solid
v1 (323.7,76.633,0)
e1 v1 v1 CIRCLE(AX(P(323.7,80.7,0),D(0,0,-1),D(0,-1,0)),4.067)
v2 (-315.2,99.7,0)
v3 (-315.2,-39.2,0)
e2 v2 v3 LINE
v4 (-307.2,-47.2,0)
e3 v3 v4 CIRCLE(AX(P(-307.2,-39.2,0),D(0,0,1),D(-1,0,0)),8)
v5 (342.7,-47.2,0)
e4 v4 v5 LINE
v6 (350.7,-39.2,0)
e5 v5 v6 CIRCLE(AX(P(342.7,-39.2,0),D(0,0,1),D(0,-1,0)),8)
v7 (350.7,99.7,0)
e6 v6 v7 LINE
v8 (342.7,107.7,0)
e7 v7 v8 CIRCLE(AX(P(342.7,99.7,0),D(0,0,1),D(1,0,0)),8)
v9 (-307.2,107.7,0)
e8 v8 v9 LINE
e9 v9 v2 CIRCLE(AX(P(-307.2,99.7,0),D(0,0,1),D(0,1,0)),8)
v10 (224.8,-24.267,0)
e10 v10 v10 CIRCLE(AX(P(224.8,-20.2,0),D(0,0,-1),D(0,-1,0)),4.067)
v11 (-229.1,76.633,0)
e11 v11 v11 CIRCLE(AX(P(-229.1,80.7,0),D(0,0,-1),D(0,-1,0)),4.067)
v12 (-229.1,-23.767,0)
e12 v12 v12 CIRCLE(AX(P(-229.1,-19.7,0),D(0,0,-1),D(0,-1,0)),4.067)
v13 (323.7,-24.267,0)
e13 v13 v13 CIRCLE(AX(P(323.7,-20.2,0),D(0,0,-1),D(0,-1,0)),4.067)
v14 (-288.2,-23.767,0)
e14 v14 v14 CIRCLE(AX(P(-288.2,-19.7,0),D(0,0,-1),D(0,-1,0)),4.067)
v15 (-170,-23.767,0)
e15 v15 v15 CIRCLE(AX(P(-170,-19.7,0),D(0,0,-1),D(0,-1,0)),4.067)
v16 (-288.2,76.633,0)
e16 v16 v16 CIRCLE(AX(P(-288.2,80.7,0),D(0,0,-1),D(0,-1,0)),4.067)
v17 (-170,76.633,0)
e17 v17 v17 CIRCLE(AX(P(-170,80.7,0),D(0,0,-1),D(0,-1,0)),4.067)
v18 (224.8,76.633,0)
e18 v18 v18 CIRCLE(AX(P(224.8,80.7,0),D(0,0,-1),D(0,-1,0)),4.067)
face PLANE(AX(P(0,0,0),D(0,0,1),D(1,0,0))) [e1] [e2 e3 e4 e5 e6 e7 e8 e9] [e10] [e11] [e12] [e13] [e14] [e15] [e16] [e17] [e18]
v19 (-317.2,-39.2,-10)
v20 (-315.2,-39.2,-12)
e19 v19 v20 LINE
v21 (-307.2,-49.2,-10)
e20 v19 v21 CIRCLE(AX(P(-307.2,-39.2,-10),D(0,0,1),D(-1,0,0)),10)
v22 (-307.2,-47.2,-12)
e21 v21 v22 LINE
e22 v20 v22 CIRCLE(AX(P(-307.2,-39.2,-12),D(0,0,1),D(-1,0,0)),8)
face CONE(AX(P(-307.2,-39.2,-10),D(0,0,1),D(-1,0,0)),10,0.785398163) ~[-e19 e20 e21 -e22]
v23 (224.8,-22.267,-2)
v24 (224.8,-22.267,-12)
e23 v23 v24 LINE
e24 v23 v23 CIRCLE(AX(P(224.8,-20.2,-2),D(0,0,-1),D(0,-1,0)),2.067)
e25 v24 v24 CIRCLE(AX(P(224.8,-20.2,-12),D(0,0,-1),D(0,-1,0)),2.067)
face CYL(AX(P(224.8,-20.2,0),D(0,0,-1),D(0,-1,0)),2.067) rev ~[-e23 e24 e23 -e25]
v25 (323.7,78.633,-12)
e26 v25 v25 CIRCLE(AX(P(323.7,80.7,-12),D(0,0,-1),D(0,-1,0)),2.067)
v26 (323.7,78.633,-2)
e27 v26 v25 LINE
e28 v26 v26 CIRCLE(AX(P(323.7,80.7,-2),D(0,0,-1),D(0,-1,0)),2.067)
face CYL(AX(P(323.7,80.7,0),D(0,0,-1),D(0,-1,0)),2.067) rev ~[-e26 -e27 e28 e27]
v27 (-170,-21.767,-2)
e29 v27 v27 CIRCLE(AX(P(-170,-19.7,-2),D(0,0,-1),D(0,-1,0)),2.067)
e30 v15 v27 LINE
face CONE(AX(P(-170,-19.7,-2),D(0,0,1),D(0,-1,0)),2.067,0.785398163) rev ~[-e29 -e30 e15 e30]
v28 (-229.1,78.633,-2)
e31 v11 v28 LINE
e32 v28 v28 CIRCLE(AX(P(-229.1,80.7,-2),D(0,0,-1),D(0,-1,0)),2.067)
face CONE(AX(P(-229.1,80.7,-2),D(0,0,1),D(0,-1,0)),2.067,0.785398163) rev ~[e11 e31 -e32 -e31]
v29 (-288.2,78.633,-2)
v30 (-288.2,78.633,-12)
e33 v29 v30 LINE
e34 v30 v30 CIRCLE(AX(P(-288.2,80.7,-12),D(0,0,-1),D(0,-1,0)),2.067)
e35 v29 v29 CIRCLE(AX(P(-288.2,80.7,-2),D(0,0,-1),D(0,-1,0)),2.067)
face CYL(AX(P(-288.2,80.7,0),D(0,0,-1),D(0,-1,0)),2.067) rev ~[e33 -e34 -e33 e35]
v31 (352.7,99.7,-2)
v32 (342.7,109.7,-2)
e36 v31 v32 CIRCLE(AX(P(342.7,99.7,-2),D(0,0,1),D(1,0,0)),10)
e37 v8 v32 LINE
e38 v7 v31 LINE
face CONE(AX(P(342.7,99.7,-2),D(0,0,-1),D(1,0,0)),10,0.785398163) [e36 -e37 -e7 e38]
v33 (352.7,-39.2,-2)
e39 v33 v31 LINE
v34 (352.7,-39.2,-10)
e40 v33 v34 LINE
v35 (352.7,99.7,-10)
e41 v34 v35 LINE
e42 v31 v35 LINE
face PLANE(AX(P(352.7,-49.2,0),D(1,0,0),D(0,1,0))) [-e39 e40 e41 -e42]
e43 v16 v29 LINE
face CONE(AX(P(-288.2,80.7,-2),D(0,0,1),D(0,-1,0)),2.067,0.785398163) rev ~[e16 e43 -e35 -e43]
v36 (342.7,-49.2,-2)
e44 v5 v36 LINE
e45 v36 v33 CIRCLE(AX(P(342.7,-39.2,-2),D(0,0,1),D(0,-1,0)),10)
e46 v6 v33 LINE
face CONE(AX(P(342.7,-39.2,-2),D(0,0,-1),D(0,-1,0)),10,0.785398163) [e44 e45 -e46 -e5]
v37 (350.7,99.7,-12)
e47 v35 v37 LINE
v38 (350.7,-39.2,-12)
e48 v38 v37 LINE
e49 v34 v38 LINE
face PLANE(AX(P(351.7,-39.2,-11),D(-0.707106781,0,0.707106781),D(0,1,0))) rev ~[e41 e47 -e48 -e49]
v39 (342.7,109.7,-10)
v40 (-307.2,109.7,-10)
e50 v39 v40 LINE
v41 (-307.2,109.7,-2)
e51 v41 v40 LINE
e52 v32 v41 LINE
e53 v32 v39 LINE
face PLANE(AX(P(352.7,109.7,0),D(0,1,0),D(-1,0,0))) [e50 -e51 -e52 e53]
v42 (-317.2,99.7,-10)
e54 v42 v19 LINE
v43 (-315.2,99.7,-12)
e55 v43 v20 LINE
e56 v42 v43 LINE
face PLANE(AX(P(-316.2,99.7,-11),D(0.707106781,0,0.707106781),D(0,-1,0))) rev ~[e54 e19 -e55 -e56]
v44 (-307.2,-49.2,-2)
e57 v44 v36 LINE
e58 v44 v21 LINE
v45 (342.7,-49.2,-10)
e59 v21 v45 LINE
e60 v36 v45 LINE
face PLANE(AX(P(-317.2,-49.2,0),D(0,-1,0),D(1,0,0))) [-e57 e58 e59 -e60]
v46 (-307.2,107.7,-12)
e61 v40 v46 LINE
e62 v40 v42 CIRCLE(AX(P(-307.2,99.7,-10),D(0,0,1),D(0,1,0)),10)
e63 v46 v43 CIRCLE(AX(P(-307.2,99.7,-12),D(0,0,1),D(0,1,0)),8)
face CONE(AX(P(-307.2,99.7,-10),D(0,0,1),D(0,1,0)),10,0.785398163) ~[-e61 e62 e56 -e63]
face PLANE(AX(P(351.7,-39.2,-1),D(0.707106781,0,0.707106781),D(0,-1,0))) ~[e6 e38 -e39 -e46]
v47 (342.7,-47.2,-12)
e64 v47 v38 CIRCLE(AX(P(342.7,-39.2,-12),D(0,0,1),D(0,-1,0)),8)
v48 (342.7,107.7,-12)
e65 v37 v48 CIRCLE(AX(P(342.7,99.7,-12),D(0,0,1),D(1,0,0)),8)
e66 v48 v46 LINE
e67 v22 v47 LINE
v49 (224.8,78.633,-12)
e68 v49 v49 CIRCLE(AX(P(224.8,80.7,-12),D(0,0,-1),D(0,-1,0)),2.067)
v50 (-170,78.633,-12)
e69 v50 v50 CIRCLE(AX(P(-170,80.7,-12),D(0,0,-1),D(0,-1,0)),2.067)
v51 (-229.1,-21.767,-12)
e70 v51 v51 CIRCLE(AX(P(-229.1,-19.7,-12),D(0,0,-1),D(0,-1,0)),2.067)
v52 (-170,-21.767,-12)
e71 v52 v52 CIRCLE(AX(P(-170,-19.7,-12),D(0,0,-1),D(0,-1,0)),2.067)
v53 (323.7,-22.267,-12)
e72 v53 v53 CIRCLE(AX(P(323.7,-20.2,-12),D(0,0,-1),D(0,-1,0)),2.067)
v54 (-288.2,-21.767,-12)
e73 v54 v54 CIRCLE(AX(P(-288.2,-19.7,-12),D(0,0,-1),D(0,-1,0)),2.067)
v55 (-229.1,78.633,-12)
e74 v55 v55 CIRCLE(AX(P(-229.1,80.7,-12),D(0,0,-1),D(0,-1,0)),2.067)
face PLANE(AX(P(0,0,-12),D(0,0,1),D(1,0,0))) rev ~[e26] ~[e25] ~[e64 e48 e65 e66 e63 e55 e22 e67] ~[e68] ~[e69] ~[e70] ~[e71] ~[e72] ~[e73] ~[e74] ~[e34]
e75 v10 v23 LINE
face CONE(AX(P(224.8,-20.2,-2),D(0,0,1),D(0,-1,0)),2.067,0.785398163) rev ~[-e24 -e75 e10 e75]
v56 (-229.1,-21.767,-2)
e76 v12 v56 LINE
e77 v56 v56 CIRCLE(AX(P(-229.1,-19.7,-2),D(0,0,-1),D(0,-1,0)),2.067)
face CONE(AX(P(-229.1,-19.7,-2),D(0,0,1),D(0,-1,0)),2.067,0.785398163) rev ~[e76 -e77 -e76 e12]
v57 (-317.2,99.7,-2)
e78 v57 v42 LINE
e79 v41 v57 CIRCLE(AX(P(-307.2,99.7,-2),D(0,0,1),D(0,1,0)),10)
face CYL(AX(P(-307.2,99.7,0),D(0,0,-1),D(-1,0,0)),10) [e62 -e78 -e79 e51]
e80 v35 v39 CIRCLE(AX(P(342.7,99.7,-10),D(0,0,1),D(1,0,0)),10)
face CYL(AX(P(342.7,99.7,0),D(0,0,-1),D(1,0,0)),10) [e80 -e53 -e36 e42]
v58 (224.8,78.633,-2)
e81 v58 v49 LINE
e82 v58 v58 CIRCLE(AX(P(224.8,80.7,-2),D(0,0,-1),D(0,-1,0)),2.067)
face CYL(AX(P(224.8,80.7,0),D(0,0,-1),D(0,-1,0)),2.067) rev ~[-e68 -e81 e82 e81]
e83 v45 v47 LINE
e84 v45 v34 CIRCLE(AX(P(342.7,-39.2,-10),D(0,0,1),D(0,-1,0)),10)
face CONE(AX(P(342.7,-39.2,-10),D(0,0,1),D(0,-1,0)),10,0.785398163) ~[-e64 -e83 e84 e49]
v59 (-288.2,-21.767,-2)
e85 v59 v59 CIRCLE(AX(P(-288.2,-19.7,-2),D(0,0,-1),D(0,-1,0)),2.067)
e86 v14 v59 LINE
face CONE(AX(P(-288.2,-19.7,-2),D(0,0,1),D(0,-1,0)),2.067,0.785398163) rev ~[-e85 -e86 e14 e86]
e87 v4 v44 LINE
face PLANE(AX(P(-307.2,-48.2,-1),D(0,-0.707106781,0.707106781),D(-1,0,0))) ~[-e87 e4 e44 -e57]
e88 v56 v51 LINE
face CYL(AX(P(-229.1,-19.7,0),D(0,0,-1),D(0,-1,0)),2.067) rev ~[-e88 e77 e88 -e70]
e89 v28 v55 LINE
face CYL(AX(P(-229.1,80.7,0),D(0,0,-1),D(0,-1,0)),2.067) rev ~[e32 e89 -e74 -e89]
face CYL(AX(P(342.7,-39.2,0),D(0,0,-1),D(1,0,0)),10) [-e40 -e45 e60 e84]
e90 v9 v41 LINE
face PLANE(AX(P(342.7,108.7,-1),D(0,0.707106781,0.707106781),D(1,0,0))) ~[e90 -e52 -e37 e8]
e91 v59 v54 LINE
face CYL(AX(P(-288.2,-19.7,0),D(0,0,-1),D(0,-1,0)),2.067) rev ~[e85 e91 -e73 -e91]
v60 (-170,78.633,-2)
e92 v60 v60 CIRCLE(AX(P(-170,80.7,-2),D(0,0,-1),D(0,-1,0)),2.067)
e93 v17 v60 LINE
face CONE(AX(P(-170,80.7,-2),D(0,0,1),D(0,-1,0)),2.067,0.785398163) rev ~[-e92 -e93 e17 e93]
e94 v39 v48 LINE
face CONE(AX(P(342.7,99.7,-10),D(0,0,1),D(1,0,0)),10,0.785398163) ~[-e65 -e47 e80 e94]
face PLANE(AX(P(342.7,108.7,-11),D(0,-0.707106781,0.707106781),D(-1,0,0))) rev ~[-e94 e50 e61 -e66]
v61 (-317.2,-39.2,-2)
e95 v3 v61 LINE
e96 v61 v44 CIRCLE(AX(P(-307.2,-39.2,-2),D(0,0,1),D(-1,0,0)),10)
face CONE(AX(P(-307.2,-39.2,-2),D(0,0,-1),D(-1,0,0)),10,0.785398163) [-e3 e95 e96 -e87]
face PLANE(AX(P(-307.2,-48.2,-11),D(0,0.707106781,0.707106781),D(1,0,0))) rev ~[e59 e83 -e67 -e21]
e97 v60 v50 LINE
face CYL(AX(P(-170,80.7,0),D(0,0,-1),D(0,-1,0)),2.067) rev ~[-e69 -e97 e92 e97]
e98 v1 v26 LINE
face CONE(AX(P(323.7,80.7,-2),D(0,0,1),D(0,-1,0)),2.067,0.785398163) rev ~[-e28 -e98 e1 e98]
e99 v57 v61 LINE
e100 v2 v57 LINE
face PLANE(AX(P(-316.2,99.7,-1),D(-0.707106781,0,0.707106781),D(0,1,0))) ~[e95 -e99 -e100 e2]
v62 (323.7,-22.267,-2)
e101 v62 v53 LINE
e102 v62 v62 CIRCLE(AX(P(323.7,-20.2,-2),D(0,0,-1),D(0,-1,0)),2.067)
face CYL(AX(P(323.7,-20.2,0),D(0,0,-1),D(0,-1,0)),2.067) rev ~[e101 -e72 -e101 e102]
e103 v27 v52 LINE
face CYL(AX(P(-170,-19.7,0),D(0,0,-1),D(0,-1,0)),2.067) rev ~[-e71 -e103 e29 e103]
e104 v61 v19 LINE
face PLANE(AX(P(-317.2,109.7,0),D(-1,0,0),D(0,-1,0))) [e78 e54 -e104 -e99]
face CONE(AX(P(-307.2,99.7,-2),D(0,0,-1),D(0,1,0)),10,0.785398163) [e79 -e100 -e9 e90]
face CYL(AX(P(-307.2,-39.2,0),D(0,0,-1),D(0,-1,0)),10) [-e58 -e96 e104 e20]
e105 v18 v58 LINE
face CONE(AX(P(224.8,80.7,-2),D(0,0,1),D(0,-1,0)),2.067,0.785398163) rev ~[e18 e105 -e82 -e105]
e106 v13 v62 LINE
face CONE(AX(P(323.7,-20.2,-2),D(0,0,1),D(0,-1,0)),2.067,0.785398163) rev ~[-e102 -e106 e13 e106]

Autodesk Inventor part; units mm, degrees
ref_plane "YZ Plane" through (0, 0, 0) normal (1, 0, 0) x (0, 1, 0)
ref_plane "XZ Plane" through (0, 0, 0) normal (0, 1, 0) x (-1, 0, 0)
ref_plane "XY Plane" through (0, 0, 0) normal (0, 0, 1) x (1, 0, 0)
sketch "Sketch1" plane through (0, 0, 0) normal (0, 0, 1) x (1, 0, 0)
  circle A0 centre (323.7, 80.7) radius 3.75 projected
  circle A1 centre (224.8, -20.2) radius 3.75 projected
  line L0 (219.8, -29.2) -> (328.7, -29.2) projected
  arc A2 (215.8, -25.2) -> (219.8, -29.2) centre (219.8, -25.2) ccw projected
  line L1 (215.8, 85.7) -> (215.8, -25.2) projected
  arc A3 (219.8, 89.7) -> (215.8, 85.7) centre (219.8, 85.7) ccw projected
  line L2 (328.7, 89.7) -> (219.8, 89.7) projected
  arc A4 (332.7, 85.7) -> (328.7, 89.7) centre (328.7, 85.7) ccw projected
  line L3 (332.7, -25.2) -> (332.7, 85.7) projected
  arc A5 (328.7, -29.2) -> (332.7, -25.2) centre (328.7, -25.2) ccw projected
  circle A6 centre (224.8, 80.7) radius 3.75 projected
  circle A7 centre (323.7, -20.2) radius 3.75 projected
  circle A8 centre (-229.1, -19.7) radius 3.75 projected
  circle A9 centre (-288.2, -19.7) radius 3.75 projected
  circle A10 centre (-170, 80.7) radius 3.75 projected
  line L4 (-165, 89.7) -> (-293.2, 89.7) projected
  arc A11 (-161, 85.7) -> (-165, 89.7) centre (-165, 85.7) ccw projected
  line L5 (-161, -24.7) -> (-161, 85.7) projected
  arc A12 (-165, -28.7) -> (-161, -24.7) centre (-165, -24.7) ccw projected
  line L6 (-293.2, -28.7) -> (-165, -28.7) projected
  arc A13 (-297.2, -24.7) -> (-293.2, -28.7) centre (-293.2, -24.7) ccw projected
  arc A14 (-293.2, 89.7) -> (-297.2, 85.7) centre (-293.2, 85.7) ccw projected
  circle A15 centre (-170, -19.7) radius 3.75 projected
  circle A16 centre (-288.2, 80.7) radius 3.75 projected
  circle A17 centre (-229.1, 80.7) radius 3.75 projected
  line L7 (352.7, 109.7) -> (-317.2, 109.7)
  line L8 (-317.2, 109.7) -> (-317.2, -49.2)
  line L9 (-317.2, -49.2) -> (352.7, -49.2)
  line L10 (352.7, -49.2) -> (352.7, 109.7)
  line L11 (-297.2, 85.7) -> (-297.2, -24.7) projected
  point P0 (0, 0)
  dimension "d0" = 20
  dimension "d1" = 20
  dimension "d2" = 20
extrude "Extrusion1" add sketch "Sketch1" against normal blind 12 contours A0 | A1 | A2 L1 A3 L2 A4 L3 A5 L0 | A6 | A7 | A8 | A9 | A10 | A11 L5 A12 L6 A13 L11 A14 L4 | A15 | A16 | A17 | L10 L9 L8 L7
fillet "Fillet1" radius 10 4 edges at (352.7, 109.7, -6) (352.7, -49.2, -6) (-317.2, -49.2, -6) (-317.2, 109.7, -6)
sketch "Sketch2" plane through (0, 0, 0) normal (0, 0, 1) x (1, 0, 0)
  circle A0 centre (323.7, -20.2) radius 2.75 projected
  circle A1 centre (224.8, -20.2) radius 2.75 projected
  circle A2 centre (323.7, 80.7) radius 3.75 projected
  circle A3 centre (224.8, 80.7) radius 3.75 projected
  circle A4 centre (-170, 80.7) radius 3.75 projected
  circle A5 centre (-229.1, 80.7) radius 3.75 projected
  circle A6 centre (-288.2, 80.7) radius 3.75 projected
  circle A7 centre (-288.2, -19.7) radius 2.75 projected
  circle A8 centre (-229.1, -19.7) radius 2.75 projected
  circle A9 centre (-170, -19.7) radius 3.75 projected
  point P0 (0, 0)
hole "Hole1" at (323.7, 80.7, 0) at (224.8, 80.7, 0) at (323.7, -20.2, 0) at (224.8, -20.2, 0) at (-170, -19.7, 0) at (-229.1, -19.7, 0) at (-288.2, -19.7, 0) at (-288.2, 80.7, 0) at (-229.1, 80.7, 0) at (-170, 80.7, 0) direction (0, 0, -1) diameter 4.134 end through all thread size "M5x0.8" class "6H" standard "ANSI Metric M Profile"
chamfer "Chamfer1" distance 2 angle 45 10 edges at (323.7, -18.133, 0) (323.7, 82.767, 0) (224.8, 82.767, 0) (224.8, -18.133, 0) (-170, -17.633, 0) (-170, 82.767, 0) (-229.1, 82.767, 0) (-288.2, 82.767, 0) (-288.2, -17.633, 0) (-229.1, -17.633, 0)
chamfer "Chamfer2" distance 2 angle 45 16 edges at (17.75, 109.7, 0) (-314.2711, 106.7711, 0) (-317.2, 30.25, 0) (-314.2711, -46.2711, 0) (17.75, -49.2, 0) (349.7711, -46.2711, 0) (352.7, 30.25, 0) (349.7711, 106.7711, 0) (17.75, 109.7, -12) (349.7711, 106.7711, -12) (352.7, 30.25, -12) (349.7711, -46.2711, -12) (17.75, -49.2, -12) (-314.2711, -46.2711, -12) (-317.2, 30.25, -12) (-314.2711, 106.7711, -12)
sketch "Sketch3" plane through (0, 0, 0) normal (0, 0, 1) x (1, 0, 0)
  arc A0 (342.7, -49.2) -> (352.7, -39.2) centre (342.7, -39.2) ccw projected
  line L0 (-307.2, -49.2) -> (342.7, -49.2) projected
  line L1 (352.7, -39.2) -> (352.7, 99.7) projected
  arc A1 (352.7, 99.7) -> (342.7, 109.7) centre (342.7, 99.7) ccw projected
  line L2 (342.7, 109.7) -> (-307.2, 109.7) projected
  arc A2 (-307.2, 109.7) -> (-317.2, 99.7) centre (-307.2, 99.7) ccw projected
  line L3 (-317.2, 99.7) -> (-317.2, -39.2) projected
  arc A3 (-317.2, -39.2) -> (-307.2, -49.2) centre (-307.2, -39.2) ccw projected
  circle A4 centre (-288.2, -19.7) radius 2.067 projected
  circle A5 centre (-288.2, 80.7) radius 2.067 projected
  circle A6 centre (-229.1, 80.7) radius 2.067 projected
  circle A7 centre (-170, 80.7) radius 2.067 projected
  circle A8 centre (-170, -19.7) radius 2.067 projected
  circle A9 centre (-229.1, -19.7) radius 2.067 projected
  circle A10 centre (224.8, -20.2) radius 2.067 projected
  circle A11 centre (323.7, -20.2) radius 2.067 projected
  circle A12 centre (323.7, 80.7) radius 2.067 projected
  circle A13 centre (224.8, 80.7) radius 2.067 projected
  point P0 (0, 0)
properties part number "MountingPlate" material "Steel"
